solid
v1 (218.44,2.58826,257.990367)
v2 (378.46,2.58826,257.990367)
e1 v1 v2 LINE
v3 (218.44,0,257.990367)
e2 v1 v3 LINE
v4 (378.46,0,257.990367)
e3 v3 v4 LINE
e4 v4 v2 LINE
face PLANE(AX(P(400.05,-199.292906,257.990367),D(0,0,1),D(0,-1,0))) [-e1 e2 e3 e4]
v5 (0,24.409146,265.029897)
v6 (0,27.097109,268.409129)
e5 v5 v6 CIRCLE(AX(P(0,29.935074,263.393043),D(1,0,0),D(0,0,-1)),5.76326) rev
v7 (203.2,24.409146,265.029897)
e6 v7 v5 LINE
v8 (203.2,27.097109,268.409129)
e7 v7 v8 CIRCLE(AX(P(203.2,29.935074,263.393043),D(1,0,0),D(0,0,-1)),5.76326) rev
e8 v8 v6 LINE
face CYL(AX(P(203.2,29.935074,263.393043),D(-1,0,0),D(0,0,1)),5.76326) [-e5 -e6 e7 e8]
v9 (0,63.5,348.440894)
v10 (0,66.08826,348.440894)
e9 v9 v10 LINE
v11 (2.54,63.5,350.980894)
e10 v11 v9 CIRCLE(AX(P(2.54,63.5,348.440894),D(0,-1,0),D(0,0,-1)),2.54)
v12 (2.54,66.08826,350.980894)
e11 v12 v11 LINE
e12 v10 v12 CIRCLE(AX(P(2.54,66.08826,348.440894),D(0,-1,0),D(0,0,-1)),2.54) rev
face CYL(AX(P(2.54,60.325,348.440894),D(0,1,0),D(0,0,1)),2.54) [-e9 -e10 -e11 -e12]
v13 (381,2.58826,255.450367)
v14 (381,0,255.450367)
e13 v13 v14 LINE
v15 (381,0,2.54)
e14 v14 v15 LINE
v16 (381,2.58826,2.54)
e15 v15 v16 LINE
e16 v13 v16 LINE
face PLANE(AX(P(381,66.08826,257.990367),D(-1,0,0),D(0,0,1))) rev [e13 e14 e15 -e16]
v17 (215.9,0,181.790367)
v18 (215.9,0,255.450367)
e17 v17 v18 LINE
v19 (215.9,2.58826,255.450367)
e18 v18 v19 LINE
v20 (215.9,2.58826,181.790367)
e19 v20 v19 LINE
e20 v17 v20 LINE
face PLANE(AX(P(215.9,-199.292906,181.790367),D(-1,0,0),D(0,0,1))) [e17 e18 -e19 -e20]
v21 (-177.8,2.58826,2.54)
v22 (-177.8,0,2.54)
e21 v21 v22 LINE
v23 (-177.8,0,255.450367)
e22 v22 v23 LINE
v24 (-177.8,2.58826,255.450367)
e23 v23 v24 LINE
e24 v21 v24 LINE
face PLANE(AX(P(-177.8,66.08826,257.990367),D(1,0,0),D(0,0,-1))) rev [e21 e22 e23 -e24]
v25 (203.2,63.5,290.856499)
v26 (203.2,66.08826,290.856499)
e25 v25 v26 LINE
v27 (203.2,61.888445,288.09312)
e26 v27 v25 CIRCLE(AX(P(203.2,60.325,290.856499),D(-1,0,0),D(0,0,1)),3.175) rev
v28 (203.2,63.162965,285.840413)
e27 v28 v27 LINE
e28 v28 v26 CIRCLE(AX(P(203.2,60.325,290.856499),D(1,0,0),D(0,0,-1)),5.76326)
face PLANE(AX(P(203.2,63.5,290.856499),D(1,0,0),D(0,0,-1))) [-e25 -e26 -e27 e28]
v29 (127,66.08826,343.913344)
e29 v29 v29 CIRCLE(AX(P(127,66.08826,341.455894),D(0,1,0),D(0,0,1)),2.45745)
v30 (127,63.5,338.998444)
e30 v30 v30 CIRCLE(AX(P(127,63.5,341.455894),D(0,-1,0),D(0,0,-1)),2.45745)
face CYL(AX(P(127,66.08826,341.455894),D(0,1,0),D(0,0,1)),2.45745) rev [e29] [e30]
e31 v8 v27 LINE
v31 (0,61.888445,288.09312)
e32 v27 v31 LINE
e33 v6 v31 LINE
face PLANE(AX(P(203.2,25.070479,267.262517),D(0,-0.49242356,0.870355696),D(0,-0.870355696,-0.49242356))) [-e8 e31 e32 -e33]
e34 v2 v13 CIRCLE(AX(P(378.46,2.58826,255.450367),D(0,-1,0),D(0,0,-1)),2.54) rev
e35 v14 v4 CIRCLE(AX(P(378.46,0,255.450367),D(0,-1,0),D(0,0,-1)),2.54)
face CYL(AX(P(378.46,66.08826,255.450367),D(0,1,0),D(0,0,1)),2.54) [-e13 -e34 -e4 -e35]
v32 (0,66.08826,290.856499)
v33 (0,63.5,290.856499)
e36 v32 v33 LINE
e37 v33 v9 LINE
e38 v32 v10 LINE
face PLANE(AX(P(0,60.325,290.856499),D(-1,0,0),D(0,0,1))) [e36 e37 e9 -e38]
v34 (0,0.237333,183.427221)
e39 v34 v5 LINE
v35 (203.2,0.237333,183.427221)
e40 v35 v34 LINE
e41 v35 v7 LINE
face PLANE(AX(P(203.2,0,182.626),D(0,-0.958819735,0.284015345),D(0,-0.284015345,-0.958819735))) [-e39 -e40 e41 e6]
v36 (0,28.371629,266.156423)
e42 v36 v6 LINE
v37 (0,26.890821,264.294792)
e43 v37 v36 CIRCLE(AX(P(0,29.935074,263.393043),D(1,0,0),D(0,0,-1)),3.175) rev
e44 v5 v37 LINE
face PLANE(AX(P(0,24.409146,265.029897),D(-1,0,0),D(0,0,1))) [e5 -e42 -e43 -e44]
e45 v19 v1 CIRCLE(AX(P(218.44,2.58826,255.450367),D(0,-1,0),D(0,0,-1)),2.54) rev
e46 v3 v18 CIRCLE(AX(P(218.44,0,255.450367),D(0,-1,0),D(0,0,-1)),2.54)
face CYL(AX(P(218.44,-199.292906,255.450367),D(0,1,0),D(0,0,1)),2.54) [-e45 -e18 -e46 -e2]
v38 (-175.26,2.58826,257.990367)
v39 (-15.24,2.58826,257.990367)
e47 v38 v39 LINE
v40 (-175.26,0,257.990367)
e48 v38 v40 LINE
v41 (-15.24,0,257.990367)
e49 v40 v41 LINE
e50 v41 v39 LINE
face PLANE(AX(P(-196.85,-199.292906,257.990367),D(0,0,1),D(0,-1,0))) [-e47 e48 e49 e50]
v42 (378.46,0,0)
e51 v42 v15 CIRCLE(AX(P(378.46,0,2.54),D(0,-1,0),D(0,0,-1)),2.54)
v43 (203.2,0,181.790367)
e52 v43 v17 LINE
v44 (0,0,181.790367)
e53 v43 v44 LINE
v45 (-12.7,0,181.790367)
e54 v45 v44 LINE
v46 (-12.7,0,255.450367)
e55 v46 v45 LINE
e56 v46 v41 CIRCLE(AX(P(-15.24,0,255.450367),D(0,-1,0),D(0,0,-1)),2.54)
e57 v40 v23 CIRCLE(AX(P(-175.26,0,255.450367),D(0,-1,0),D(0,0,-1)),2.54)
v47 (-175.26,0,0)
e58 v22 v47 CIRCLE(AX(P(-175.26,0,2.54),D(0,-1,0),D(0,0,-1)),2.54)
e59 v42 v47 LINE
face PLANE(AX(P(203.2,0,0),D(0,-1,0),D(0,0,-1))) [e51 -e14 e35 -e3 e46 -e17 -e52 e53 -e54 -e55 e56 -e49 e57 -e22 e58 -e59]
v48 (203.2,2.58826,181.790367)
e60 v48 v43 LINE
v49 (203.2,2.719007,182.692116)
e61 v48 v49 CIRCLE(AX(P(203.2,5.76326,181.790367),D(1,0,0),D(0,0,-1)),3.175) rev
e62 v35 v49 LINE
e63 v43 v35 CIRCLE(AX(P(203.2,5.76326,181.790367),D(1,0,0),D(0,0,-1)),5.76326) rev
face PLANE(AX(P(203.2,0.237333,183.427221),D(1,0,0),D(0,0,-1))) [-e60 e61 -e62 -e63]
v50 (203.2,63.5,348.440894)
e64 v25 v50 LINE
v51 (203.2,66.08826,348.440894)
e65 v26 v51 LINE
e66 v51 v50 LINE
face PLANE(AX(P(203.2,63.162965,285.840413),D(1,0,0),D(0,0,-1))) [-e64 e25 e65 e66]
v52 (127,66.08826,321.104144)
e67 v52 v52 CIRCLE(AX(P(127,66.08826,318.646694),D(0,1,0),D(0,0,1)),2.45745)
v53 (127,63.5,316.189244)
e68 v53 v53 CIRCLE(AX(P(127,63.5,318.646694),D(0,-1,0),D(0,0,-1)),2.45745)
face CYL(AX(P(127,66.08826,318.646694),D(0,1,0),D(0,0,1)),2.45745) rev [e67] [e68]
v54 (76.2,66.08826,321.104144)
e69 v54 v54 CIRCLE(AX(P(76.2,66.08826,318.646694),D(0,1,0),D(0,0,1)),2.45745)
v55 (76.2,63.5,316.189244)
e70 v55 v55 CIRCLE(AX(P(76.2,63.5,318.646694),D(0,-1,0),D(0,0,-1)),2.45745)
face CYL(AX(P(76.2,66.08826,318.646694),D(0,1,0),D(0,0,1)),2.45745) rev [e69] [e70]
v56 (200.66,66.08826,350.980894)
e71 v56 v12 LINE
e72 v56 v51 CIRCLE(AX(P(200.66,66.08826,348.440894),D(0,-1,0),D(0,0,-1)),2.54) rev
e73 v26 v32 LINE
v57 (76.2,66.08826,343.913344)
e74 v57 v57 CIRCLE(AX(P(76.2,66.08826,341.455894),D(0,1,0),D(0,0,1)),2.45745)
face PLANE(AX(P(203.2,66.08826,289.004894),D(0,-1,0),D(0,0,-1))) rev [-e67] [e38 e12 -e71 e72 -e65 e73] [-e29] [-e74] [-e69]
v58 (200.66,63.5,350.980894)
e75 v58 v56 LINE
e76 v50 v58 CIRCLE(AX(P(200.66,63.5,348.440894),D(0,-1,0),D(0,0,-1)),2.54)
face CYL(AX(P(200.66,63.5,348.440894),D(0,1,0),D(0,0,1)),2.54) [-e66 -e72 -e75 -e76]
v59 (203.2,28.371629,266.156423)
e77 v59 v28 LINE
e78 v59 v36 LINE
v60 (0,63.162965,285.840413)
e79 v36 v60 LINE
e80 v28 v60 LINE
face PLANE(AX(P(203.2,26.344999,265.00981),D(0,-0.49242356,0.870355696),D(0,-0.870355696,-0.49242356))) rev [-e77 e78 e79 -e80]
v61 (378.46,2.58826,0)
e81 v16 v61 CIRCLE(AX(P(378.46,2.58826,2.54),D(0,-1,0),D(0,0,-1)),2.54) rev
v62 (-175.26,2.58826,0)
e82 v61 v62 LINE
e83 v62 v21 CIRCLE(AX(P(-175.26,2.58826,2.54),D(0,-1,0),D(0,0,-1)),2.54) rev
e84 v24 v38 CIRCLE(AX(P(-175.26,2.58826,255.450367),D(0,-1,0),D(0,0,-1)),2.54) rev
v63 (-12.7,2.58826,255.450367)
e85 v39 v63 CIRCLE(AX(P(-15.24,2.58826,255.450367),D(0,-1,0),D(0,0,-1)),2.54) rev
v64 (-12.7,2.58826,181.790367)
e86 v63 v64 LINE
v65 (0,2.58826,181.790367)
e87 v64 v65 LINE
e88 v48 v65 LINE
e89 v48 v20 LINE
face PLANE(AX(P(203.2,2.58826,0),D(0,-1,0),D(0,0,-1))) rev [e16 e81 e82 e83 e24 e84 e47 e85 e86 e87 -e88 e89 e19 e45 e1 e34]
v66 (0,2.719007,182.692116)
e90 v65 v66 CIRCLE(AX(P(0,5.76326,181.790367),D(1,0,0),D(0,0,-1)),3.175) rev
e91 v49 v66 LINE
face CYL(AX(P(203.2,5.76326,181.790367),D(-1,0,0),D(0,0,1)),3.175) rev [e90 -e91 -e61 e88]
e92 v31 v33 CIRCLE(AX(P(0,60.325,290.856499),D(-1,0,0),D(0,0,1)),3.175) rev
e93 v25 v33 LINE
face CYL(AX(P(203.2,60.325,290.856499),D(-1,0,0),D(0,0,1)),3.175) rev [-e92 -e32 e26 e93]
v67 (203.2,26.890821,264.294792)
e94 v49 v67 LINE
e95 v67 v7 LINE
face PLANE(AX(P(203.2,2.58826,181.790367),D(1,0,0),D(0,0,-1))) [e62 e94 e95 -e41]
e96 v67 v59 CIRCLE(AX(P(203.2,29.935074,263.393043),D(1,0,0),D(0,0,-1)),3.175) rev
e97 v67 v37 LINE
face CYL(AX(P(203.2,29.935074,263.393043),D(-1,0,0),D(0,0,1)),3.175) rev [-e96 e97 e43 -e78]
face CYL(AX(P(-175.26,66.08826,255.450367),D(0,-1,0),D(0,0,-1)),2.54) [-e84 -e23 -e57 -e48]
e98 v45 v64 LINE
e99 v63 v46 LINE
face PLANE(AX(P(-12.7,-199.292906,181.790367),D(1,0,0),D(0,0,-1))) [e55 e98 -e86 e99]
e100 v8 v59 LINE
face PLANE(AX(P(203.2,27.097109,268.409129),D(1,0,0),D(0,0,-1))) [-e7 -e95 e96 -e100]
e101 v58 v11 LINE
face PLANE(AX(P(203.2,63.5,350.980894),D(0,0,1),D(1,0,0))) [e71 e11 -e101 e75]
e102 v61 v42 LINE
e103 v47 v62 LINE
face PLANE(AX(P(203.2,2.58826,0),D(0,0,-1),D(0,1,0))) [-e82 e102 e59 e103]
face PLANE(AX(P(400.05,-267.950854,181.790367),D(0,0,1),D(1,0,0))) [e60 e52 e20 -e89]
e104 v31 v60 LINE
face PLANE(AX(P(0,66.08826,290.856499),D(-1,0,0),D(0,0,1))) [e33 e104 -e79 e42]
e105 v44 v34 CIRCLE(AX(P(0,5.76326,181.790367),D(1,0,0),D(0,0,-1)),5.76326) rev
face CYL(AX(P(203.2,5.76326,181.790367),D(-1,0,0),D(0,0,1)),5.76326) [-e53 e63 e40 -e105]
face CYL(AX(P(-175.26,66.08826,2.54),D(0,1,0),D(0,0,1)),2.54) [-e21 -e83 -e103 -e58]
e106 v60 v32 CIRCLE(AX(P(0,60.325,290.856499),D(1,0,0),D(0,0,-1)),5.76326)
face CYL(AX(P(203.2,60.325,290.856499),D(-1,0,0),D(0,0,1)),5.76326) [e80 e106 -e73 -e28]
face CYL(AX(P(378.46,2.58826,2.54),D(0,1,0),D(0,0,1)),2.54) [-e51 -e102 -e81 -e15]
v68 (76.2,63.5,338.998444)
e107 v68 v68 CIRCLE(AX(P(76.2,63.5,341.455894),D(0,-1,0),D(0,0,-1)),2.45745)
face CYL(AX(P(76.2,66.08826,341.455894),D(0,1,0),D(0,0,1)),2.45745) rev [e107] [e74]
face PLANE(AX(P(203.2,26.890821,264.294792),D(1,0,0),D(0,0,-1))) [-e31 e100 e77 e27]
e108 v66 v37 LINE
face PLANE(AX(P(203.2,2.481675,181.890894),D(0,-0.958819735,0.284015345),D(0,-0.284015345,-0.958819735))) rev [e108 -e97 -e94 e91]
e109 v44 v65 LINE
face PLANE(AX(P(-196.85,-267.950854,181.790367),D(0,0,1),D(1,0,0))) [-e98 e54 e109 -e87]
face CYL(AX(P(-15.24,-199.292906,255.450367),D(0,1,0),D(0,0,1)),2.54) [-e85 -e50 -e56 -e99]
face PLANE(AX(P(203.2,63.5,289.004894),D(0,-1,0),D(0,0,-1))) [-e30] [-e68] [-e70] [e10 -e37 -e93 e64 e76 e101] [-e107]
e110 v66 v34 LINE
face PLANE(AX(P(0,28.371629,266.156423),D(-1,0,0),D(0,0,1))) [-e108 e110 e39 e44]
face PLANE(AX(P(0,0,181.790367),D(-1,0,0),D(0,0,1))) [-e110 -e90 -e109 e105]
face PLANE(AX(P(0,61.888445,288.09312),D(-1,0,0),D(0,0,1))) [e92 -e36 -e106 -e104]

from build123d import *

# Parameters (mm, degrees)
BASE_FLANGE1_DEPTH           = 203.2
SKETCH2_W                    = 196.85
SKETCH2_H                    = 181.790367069
BOSS_EXTRUDE1_DEPTH          = 2.58826
F_10_0_1935_DIAMETER_HOLE1_D = 4.9149
SKETCH16_W                   = 184.15
SKETCH16_H                   = 76.2
BOSS_EXTRUDE2_DEPTH          = 2.58826
SKETCH17_W                   = 19.05
SKETCH17_H                   = 257.990367069
CUT_EXTRUDE1_DEPTH           = 537.279077243
FILLET1_R                    = 2.54


# Sheet-metal steps are written as plain solids
with BuildPart() as part:
    # Sketch1 → Base-Flange1 (new body)
    with BuildSketch(Plane(origin=(0, 0, 0), x_dir=(0, 0, -1), z_dir=(1, 0, 0))):
        with BuildLine():
            Line((0, 0), (-181.790367069, 0))
            ThreePointArc((-181.790367069, 0), (-182.617352358, 0.059641748), (-183.427221345, 0.237332575))
            Line((-183.427221345, 0.237332575), (-265.029897441, 24.40914646))
            ThreePointArc((-265.029897441, 24.40914646), (-266.980756871, 25.424699599), (-268.409129334, 27.097108878))
            Line((-268.409129334, 27.097108878), (-288.093120118, 61.888444803))
            ThreePointArc((-288.093120118, 61.888444803), (-289.257017075, 63.067677729), (-290.856499452, 63.5))
            Line((-290.856499452, 63.5), (-350.980894178, 63.5))
            Line((-350.980894178, 63.5), (-350.980894178, 66.08826))
            Line((-350.980894178, 66.08826), (-290.856499452, 66.08826))
            ThreePointArc((-290.856499452, 66.08826), (-287.953119041, 65.303508614), (-285.840413284, 63.162965007))
            Line((-285.840413284, 63.162965007), (-266.156422501, 28.371629081))
            ThreePointArc((-266.156422501, 28.371629081), (-265.369527137, 27.450292987), (-264.294791885, 26.890821227))
            Line((-264.294791885, 26.890821227), (-182.692115789, 2.719007342))
            ThreePointArc((-182.692115789, 2.719007342), (-182.245956144, 2.621116847), (-181.790367069, 2.58826))
            Line((-181.790367069, 2.58826), (0, 2.58826))
            Line((0, 2.58826), (0, 0))
        make_face()
    extrude(amount=BASE_FLANGE1_DEPTH)

    # Sketch2 → Boss-Extrude1 (add)
    with BuildSketch(Plane(origin=(0, 2.58826, 0), x_dir=(1, 0, 0), z_dir=(0, 1, 0))):
        with Locations((-98.425, -90.895183535)):
            Rectangle(SKETCH2_W, SKETCH2_H)
        with Locations((301.625, -90.895183535)):
            Rectangle(SKETCH2_W, SKETCH2_H)
    extrude(amount=-BOSS_EXTRUDE1_DEPTH)

    # #10 (0.1935) Diameter Hole1 (through all)
    with Locations(Plane(origin=(0, 66.08826, 0), x_dir=(1, 0, 0), z_dir=(0, 1, 0))):
        with Locations((76.2, -341.455894178), (76.2, -318.646694178), (127, -318.646694178), (127, -341.455894178)):
            Hole(F_10_0_1935_DIAMETER_HOLE1_D / 2)

    # Sketch16 → Boss-Extrude2 (add)
    with BuildSketch(Plane(origin=(0, 2.58826, 0), x_dir=(1, 0, 0), z_dir=(0, 1, 0))):
        with Locations((-104.775, -219.890367069)):
            Rectangle(SKETCH16_W, SKETCH16_H)
        with Locations((307.975, -219.890367069)):
            Rectangle(SKETCH16_W, SKETCH16_H)
    extrude(amount=-BOSS_EXTRUDE2_DEPTH)

    # Sketch17 → Cut-Extrude1 (cut, through all)
    with BuildSketch(Plane.XZ):
        with Locations((-187.325, 128.995183535)):
            Rectangle(SKETCH17_W, SKETCH17_H)
        with Locations((390.525, 128.995183535)):
            Rectangle(SKETCH17_W, SKETCH17_H)
    extrude(amount=-CUT_EXTRUDE1_DEPTH, mode=Mode.SUBTRACT)

    # Fillet1
    fillet1_edges = [part.edges().sort_by_distance(p)[0] for p in [
        (-12.7, 1.29413, 257.990367069),
        (215.9, 1.29413, 257.990367069),
        (381, 1.29413, 257.990367069),
        (-177.8, 1.29413, 257.990367069),
        (-177.8, 1.29413, 0),
        (381, 1.29413, 0),
        (0, 64.79413, 350.980894178),
        (203.2, 64.79413, 350.980894178),
    ]]
    fillet(fillet1_edges, radius=FILLET1_R)


solid = part.part
